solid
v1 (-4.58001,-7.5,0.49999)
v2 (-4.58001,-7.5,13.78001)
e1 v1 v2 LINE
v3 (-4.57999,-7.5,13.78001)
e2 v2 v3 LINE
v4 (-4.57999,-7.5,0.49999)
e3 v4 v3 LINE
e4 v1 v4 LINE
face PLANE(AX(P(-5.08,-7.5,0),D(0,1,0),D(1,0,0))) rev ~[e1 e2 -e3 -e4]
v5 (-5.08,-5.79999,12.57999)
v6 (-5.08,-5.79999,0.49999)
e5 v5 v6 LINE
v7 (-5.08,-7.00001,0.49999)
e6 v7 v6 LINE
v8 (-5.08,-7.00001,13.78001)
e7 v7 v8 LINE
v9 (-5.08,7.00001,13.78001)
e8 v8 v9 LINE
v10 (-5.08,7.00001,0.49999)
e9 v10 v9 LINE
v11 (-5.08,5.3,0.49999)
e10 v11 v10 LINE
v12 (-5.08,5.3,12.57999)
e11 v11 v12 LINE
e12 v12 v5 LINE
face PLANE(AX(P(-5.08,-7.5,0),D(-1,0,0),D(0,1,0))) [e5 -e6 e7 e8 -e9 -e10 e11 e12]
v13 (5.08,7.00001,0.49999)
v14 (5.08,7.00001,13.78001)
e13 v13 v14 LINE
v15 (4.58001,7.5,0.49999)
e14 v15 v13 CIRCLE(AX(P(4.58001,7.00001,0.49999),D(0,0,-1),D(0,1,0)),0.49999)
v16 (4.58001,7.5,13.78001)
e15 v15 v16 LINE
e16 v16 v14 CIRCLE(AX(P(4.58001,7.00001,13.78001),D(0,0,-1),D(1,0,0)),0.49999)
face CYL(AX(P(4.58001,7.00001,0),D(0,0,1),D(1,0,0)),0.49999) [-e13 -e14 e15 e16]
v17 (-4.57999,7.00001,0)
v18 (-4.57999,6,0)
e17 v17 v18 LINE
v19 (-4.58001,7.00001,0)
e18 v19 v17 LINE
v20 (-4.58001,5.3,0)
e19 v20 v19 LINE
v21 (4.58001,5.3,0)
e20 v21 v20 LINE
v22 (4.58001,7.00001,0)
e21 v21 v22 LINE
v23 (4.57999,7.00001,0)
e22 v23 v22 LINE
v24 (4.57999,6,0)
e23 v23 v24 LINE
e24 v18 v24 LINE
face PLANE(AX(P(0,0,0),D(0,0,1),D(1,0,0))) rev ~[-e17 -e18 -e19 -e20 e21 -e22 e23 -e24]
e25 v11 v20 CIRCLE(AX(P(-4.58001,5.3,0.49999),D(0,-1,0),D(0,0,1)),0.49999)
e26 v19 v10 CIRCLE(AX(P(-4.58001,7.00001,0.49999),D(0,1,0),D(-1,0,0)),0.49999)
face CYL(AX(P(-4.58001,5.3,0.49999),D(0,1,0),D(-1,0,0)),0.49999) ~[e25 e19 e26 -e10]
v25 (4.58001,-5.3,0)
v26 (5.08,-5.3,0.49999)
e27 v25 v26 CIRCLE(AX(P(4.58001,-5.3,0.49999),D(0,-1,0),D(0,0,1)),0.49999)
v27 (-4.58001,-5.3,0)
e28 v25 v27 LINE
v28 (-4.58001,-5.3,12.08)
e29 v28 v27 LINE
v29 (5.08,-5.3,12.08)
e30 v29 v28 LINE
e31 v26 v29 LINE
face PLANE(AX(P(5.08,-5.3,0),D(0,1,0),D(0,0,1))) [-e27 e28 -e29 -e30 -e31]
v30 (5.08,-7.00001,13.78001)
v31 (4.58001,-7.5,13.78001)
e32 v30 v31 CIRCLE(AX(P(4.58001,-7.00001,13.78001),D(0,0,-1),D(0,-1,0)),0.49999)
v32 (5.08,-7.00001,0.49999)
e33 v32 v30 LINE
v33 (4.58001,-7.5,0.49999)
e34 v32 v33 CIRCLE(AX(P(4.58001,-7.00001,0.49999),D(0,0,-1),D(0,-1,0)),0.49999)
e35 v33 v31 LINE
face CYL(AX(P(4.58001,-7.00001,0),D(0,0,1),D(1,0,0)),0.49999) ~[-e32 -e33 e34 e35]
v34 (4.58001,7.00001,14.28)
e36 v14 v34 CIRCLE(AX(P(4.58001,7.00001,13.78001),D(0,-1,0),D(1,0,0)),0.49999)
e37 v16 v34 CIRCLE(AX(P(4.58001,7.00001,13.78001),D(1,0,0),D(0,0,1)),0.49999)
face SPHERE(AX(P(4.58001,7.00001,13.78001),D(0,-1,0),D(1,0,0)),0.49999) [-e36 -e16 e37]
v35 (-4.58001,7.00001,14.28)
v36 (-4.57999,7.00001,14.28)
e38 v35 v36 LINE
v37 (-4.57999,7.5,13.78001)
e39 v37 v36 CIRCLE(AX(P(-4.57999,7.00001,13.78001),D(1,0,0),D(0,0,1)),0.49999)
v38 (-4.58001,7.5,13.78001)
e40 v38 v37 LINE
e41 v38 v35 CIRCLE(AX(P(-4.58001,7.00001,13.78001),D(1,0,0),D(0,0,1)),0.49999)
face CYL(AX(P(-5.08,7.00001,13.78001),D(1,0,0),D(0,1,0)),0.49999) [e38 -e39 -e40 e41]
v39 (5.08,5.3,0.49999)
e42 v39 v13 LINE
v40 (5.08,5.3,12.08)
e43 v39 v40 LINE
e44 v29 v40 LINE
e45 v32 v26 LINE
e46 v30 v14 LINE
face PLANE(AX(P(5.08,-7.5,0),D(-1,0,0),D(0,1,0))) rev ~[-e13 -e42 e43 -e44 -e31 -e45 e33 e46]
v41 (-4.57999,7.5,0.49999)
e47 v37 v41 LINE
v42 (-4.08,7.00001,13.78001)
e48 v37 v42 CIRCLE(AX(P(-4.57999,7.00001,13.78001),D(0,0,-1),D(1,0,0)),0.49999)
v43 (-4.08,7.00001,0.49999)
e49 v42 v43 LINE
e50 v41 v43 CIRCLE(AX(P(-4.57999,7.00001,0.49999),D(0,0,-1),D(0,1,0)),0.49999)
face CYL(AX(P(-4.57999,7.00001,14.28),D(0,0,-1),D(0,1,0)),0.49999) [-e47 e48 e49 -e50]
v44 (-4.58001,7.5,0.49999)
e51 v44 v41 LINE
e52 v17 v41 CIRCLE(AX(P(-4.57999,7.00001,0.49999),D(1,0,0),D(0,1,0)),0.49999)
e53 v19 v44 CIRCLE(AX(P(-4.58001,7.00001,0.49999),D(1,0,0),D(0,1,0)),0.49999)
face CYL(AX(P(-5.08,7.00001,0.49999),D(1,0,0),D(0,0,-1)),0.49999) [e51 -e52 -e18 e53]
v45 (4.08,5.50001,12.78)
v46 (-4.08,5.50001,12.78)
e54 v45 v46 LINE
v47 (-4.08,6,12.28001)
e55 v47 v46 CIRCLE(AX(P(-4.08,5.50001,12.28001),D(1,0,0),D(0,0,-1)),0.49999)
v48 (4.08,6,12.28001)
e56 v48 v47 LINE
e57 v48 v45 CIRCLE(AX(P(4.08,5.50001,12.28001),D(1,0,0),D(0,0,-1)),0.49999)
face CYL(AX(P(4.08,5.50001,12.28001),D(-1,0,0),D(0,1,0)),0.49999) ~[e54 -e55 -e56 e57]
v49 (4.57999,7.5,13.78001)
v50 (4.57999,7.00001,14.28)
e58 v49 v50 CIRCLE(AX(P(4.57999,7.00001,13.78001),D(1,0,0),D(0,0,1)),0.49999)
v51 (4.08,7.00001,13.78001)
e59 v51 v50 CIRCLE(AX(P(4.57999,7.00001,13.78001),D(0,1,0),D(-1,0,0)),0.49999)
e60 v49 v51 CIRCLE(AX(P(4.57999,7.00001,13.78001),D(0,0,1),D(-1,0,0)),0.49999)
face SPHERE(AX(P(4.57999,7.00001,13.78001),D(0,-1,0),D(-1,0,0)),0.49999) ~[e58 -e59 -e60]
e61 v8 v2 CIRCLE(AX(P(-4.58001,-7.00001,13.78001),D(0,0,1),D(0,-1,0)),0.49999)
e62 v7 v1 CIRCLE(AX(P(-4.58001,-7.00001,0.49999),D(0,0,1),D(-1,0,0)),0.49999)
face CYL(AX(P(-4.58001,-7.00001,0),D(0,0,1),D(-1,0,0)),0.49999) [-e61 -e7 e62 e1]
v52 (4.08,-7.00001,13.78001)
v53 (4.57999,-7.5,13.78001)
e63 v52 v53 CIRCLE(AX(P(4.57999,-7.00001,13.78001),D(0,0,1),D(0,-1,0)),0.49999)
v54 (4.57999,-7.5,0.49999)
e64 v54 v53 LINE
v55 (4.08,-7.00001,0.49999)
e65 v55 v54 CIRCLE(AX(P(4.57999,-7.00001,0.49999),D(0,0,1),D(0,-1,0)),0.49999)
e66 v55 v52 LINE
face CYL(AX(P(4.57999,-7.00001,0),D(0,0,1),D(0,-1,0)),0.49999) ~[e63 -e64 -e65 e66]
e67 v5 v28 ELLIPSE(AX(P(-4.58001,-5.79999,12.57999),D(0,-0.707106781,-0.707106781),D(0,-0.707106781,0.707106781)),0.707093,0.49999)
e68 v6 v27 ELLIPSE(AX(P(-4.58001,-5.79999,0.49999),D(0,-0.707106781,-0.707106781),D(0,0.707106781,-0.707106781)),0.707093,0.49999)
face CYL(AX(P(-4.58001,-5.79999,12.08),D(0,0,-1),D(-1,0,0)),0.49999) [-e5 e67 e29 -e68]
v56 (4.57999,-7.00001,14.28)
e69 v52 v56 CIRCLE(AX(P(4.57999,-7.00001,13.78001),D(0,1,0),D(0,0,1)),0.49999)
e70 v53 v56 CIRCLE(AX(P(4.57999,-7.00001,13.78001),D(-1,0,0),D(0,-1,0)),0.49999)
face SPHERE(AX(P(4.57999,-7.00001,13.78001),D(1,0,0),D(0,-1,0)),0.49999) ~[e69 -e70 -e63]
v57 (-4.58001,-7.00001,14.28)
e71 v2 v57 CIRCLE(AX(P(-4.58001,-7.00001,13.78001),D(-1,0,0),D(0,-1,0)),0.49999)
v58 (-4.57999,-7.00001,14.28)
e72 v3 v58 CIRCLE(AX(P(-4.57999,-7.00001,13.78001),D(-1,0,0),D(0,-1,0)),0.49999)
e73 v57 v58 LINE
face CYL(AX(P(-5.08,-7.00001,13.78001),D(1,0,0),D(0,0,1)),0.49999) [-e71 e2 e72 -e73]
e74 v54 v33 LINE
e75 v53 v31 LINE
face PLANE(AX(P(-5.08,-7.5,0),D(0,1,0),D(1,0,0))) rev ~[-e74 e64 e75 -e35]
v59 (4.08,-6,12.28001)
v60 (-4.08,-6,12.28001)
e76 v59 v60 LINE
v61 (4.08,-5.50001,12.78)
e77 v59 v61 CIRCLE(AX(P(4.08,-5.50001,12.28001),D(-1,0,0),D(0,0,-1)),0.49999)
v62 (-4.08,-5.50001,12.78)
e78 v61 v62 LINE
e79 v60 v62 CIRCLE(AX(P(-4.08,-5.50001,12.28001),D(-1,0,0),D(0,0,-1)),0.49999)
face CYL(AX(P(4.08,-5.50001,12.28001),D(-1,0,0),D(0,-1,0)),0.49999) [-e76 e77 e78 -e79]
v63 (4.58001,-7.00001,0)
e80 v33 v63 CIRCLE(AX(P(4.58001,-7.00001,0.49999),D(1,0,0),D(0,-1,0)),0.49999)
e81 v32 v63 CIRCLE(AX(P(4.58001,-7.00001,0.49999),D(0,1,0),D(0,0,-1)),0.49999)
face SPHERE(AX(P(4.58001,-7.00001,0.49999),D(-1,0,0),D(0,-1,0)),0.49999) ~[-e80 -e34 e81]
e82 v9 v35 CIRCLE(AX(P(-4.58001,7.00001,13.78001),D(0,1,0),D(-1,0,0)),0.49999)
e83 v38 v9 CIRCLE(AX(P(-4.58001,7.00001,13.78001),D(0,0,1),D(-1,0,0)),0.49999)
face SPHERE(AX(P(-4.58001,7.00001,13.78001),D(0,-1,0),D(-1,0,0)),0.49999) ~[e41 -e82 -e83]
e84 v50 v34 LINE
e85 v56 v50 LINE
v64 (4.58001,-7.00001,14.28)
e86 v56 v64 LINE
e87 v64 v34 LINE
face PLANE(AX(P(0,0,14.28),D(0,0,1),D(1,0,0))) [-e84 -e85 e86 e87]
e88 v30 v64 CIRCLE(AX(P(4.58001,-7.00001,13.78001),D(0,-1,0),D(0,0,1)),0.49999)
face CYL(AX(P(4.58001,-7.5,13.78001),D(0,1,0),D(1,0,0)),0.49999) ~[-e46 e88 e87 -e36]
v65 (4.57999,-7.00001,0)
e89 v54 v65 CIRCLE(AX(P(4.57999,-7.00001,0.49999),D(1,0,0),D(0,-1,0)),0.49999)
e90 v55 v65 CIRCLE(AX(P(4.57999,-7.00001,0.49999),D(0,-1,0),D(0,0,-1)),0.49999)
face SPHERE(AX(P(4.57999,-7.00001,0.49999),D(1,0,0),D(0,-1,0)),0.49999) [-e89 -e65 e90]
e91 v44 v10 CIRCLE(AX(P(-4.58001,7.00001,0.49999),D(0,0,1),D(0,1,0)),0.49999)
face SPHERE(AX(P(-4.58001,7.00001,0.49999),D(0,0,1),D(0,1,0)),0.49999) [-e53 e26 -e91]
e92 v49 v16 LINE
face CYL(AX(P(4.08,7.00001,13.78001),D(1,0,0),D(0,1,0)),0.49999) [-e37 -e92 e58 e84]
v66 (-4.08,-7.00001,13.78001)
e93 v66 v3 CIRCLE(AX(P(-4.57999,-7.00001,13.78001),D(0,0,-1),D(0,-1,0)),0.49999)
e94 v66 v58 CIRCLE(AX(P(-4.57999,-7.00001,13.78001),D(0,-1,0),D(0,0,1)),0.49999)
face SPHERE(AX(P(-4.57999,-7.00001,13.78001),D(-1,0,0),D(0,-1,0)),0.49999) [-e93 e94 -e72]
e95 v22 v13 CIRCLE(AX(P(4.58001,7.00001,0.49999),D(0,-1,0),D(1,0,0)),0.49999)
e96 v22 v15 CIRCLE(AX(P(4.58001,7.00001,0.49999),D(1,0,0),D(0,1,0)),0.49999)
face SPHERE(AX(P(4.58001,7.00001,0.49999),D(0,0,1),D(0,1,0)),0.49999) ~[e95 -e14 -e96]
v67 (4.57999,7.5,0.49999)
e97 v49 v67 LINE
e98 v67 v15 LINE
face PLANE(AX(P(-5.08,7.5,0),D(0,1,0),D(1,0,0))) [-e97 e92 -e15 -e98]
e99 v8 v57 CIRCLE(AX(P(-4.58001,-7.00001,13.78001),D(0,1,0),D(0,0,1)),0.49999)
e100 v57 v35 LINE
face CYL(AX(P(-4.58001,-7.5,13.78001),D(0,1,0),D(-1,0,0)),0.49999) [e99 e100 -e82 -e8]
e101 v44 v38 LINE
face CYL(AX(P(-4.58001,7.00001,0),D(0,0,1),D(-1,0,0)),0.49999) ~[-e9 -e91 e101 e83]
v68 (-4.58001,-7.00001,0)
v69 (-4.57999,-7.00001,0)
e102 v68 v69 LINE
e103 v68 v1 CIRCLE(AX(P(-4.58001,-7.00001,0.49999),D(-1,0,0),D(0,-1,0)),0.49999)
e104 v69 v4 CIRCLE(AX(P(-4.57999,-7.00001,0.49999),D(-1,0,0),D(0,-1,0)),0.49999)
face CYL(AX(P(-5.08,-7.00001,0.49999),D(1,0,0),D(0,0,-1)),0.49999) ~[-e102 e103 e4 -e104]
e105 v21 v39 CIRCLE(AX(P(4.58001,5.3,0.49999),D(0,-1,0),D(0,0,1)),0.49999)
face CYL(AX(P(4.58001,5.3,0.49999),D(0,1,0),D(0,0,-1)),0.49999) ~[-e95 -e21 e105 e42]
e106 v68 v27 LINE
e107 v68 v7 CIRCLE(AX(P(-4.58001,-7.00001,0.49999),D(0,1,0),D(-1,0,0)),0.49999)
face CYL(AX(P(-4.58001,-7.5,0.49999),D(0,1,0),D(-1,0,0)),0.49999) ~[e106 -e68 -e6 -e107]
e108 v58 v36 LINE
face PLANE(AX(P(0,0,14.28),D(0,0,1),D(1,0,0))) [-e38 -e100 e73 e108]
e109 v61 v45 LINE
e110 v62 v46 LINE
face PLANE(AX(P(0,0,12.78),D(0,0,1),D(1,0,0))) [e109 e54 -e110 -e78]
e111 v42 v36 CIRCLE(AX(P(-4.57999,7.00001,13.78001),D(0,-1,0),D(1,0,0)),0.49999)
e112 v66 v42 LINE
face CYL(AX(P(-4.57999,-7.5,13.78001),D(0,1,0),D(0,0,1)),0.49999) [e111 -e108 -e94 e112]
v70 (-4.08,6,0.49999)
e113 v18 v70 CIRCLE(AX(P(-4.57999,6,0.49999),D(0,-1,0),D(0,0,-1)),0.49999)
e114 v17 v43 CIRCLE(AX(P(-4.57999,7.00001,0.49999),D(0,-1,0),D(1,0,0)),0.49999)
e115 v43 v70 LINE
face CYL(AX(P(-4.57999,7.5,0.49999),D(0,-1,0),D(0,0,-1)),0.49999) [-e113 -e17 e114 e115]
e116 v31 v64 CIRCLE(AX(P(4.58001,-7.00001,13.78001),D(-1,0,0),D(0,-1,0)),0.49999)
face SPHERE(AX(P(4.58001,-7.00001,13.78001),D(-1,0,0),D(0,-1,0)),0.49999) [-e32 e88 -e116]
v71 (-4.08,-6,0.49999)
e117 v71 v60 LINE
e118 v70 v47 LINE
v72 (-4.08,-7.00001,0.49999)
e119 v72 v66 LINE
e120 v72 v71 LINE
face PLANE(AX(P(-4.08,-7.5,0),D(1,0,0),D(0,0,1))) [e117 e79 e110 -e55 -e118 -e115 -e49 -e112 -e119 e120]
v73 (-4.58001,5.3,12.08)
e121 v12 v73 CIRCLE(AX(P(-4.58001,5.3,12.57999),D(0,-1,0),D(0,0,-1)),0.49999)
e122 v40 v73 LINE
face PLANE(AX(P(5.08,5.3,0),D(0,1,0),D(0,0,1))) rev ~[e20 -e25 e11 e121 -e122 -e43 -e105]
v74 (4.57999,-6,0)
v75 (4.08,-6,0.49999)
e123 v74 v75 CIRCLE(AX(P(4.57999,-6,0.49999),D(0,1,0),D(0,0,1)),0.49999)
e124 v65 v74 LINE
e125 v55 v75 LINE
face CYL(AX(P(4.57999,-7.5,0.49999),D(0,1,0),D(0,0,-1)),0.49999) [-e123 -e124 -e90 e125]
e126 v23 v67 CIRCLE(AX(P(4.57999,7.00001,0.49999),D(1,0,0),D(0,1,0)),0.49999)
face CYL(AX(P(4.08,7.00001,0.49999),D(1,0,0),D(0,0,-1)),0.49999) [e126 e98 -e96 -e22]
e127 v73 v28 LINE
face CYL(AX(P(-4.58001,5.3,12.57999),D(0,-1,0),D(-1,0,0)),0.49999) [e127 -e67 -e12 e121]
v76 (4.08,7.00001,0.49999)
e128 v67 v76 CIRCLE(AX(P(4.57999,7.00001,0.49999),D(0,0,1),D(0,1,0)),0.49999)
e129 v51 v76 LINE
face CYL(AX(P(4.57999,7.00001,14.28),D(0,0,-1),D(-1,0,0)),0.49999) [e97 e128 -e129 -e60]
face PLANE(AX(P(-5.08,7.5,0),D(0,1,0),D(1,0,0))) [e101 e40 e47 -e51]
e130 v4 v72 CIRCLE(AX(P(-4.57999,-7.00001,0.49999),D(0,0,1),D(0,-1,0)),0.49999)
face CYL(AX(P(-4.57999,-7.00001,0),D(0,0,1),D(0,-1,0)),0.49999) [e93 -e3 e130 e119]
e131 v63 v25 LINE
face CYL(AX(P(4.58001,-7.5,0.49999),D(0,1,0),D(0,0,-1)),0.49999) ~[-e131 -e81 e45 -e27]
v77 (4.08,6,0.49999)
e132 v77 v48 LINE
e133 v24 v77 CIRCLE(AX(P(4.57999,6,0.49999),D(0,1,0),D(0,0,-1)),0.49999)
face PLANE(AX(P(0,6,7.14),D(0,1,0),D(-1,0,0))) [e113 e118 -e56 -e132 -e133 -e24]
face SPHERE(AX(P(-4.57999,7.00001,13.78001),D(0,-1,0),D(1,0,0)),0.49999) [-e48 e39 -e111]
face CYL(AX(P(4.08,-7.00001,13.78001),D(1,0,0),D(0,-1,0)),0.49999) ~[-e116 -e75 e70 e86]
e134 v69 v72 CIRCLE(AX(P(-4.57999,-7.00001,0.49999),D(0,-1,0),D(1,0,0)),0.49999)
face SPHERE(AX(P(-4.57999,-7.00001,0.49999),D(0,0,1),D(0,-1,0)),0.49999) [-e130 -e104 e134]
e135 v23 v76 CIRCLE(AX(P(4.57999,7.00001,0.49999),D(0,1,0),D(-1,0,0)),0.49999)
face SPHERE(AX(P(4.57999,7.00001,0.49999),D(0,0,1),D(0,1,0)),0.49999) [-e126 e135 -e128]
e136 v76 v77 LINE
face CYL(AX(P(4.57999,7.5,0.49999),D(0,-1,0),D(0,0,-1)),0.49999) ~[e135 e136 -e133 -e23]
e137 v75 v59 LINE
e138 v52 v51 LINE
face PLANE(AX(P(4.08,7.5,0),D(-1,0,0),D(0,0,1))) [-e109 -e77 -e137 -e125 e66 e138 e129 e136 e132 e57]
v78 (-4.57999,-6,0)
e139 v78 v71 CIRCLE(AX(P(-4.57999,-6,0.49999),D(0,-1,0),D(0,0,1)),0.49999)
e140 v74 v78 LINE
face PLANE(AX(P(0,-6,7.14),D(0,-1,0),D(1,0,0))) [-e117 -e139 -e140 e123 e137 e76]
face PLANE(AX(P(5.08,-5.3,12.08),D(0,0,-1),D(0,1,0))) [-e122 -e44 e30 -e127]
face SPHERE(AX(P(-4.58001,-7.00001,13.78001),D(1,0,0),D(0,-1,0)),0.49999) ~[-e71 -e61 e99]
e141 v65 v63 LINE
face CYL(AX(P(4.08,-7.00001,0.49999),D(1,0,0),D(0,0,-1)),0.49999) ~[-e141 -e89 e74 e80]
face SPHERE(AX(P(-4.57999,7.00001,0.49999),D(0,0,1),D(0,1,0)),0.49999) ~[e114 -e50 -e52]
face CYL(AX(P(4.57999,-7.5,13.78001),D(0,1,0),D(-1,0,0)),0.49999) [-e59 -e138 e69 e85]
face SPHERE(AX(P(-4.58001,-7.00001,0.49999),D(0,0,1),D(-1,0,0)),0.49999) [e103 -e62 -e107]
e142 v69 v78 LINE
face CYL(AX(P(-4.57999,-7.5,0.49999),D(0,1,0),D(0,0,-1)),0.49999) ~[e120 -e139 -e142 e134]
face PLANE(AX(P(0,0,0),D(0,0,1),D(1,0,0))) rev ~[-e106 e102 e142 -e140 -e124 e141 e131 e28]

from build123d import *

# Parameters (mm, degrees)
F0_W     = 10.16
F0_H     = 15
F1_DEPTH = 14.28
F2_W     = 8.16
F2_H     = 14.28
F5_DEPTH = 1.5
F3_W     = 8.16
F3_H     = 15
F6_DEPTH = 1.5
F4_W     = 8.16
F4_H     = 14.28
F7_DEPTH = 1.5
F8_W     = 10.6
F8_H     = 12.08
F9_DEPTH = 25
F10_R    = 0.49999


# Not quite as in the source:
# - a fillet or chamfer is up to 0.001 mm smaller than in the source, because OpenCascade refuses the exact size


with BuildPart() as f1:
    # F0 (on Top) → F1 (new body)
    with BuildSketch(Plane.XY):
        Rectangle(F0_W, F0_H)
    extrude(amount=F1_DEPTH)

    # F2 (on face) → F5 (cut)
    with BuildSketch(Plane.XZ.offset(7.5)):
        with Locations((0, 7.14)):
            Rectangle(F2_W, F2_H)
    extrude(amount=-F5_DEPTH, mode=Mode.SUBTRACT)

    # F3 (on face) → F6 (cut)
    with BuildSketch(Plane.XY.offset(14.28)):
        Rectangle(F3_W, F3_H)
    extrude(amount=-F6_DEPTH, mode=Mode.SUBTRACT)

    # F4 (on face) → F7 (cut)
    with BuildSketch(Plane(origin=(0, 7.5, 0), x_dir=(-1, 0, 0), z_dir=(0, 1, 0))):
        with Locations((0, 7.14)):
            Rectangle(F4_W, F4_H)
    extrude(amount=-F7_DEPTH, mode=Mode.SUBTRACT)

    # F8 (on face) → F9 (cut)
    with BuildSketch(Plane.YZ.offset(5.08)):
        with Locations((0, 6.04)):
            Rectangle(F8_W, F8_H)
    extrude(amount=-F9_DEPTH, mode=Mode.SUBTRACT)

    # F10 (radius 0.5 in the source; OpenCascade refuses exactly that, so slightly less here)
    f10_edges = [f1.edges().sort_by_distance(p)[0] for p in [
        (-4.58, -7.5, 14.28),
        (4.58, -7.5, 14.28),
        (-4.08, -7.5, 7.14),
        (-5.08, -7.5, 7.14),
        (-5.08, 0, 14.28),
        (-5.08, 0, 12.08),
        (-5.08, -5.3, 6.04),
        (-5.08, -6.4, 0),
        (-4.58, -7.5, 0),
        (4.58, -7.5, 0),
        (4.08, -7.5, 7.14),
        (5.08, -7.5, 7.14),
        (5.08, 0, 14.28),
        (-4.08, 0, 14.28),
        (4.08, 0, 14.28),
        (5.08, 7.5, 7.14),
        (4.08, 7.5, 7.14),
        (-4.08, 7.5, 7.14),
        (-5.08, 7.5, 7.14),
        (-4.58, 7.5, 14.28),
        (4.58, 7.5, 14.28),
        (4.58, 7.5, 0),
        (-4.58, 7.5, 0),
        (-5.08, 6.4, 0),
        (-4.08, 6.75, 0),
        (4.08, 6.75, 0),
        (5.08, 6.4, 0),
        (5.08, -6.4, 0),
        (-4.08, -6.75, 0),
        (4.08, -6.75, 0),
        (0, -6, 12.78),
        (0, 6, 12.78),
    ]]
    fillet(f10_edges, radius=F10_R)


solid = f1.part
